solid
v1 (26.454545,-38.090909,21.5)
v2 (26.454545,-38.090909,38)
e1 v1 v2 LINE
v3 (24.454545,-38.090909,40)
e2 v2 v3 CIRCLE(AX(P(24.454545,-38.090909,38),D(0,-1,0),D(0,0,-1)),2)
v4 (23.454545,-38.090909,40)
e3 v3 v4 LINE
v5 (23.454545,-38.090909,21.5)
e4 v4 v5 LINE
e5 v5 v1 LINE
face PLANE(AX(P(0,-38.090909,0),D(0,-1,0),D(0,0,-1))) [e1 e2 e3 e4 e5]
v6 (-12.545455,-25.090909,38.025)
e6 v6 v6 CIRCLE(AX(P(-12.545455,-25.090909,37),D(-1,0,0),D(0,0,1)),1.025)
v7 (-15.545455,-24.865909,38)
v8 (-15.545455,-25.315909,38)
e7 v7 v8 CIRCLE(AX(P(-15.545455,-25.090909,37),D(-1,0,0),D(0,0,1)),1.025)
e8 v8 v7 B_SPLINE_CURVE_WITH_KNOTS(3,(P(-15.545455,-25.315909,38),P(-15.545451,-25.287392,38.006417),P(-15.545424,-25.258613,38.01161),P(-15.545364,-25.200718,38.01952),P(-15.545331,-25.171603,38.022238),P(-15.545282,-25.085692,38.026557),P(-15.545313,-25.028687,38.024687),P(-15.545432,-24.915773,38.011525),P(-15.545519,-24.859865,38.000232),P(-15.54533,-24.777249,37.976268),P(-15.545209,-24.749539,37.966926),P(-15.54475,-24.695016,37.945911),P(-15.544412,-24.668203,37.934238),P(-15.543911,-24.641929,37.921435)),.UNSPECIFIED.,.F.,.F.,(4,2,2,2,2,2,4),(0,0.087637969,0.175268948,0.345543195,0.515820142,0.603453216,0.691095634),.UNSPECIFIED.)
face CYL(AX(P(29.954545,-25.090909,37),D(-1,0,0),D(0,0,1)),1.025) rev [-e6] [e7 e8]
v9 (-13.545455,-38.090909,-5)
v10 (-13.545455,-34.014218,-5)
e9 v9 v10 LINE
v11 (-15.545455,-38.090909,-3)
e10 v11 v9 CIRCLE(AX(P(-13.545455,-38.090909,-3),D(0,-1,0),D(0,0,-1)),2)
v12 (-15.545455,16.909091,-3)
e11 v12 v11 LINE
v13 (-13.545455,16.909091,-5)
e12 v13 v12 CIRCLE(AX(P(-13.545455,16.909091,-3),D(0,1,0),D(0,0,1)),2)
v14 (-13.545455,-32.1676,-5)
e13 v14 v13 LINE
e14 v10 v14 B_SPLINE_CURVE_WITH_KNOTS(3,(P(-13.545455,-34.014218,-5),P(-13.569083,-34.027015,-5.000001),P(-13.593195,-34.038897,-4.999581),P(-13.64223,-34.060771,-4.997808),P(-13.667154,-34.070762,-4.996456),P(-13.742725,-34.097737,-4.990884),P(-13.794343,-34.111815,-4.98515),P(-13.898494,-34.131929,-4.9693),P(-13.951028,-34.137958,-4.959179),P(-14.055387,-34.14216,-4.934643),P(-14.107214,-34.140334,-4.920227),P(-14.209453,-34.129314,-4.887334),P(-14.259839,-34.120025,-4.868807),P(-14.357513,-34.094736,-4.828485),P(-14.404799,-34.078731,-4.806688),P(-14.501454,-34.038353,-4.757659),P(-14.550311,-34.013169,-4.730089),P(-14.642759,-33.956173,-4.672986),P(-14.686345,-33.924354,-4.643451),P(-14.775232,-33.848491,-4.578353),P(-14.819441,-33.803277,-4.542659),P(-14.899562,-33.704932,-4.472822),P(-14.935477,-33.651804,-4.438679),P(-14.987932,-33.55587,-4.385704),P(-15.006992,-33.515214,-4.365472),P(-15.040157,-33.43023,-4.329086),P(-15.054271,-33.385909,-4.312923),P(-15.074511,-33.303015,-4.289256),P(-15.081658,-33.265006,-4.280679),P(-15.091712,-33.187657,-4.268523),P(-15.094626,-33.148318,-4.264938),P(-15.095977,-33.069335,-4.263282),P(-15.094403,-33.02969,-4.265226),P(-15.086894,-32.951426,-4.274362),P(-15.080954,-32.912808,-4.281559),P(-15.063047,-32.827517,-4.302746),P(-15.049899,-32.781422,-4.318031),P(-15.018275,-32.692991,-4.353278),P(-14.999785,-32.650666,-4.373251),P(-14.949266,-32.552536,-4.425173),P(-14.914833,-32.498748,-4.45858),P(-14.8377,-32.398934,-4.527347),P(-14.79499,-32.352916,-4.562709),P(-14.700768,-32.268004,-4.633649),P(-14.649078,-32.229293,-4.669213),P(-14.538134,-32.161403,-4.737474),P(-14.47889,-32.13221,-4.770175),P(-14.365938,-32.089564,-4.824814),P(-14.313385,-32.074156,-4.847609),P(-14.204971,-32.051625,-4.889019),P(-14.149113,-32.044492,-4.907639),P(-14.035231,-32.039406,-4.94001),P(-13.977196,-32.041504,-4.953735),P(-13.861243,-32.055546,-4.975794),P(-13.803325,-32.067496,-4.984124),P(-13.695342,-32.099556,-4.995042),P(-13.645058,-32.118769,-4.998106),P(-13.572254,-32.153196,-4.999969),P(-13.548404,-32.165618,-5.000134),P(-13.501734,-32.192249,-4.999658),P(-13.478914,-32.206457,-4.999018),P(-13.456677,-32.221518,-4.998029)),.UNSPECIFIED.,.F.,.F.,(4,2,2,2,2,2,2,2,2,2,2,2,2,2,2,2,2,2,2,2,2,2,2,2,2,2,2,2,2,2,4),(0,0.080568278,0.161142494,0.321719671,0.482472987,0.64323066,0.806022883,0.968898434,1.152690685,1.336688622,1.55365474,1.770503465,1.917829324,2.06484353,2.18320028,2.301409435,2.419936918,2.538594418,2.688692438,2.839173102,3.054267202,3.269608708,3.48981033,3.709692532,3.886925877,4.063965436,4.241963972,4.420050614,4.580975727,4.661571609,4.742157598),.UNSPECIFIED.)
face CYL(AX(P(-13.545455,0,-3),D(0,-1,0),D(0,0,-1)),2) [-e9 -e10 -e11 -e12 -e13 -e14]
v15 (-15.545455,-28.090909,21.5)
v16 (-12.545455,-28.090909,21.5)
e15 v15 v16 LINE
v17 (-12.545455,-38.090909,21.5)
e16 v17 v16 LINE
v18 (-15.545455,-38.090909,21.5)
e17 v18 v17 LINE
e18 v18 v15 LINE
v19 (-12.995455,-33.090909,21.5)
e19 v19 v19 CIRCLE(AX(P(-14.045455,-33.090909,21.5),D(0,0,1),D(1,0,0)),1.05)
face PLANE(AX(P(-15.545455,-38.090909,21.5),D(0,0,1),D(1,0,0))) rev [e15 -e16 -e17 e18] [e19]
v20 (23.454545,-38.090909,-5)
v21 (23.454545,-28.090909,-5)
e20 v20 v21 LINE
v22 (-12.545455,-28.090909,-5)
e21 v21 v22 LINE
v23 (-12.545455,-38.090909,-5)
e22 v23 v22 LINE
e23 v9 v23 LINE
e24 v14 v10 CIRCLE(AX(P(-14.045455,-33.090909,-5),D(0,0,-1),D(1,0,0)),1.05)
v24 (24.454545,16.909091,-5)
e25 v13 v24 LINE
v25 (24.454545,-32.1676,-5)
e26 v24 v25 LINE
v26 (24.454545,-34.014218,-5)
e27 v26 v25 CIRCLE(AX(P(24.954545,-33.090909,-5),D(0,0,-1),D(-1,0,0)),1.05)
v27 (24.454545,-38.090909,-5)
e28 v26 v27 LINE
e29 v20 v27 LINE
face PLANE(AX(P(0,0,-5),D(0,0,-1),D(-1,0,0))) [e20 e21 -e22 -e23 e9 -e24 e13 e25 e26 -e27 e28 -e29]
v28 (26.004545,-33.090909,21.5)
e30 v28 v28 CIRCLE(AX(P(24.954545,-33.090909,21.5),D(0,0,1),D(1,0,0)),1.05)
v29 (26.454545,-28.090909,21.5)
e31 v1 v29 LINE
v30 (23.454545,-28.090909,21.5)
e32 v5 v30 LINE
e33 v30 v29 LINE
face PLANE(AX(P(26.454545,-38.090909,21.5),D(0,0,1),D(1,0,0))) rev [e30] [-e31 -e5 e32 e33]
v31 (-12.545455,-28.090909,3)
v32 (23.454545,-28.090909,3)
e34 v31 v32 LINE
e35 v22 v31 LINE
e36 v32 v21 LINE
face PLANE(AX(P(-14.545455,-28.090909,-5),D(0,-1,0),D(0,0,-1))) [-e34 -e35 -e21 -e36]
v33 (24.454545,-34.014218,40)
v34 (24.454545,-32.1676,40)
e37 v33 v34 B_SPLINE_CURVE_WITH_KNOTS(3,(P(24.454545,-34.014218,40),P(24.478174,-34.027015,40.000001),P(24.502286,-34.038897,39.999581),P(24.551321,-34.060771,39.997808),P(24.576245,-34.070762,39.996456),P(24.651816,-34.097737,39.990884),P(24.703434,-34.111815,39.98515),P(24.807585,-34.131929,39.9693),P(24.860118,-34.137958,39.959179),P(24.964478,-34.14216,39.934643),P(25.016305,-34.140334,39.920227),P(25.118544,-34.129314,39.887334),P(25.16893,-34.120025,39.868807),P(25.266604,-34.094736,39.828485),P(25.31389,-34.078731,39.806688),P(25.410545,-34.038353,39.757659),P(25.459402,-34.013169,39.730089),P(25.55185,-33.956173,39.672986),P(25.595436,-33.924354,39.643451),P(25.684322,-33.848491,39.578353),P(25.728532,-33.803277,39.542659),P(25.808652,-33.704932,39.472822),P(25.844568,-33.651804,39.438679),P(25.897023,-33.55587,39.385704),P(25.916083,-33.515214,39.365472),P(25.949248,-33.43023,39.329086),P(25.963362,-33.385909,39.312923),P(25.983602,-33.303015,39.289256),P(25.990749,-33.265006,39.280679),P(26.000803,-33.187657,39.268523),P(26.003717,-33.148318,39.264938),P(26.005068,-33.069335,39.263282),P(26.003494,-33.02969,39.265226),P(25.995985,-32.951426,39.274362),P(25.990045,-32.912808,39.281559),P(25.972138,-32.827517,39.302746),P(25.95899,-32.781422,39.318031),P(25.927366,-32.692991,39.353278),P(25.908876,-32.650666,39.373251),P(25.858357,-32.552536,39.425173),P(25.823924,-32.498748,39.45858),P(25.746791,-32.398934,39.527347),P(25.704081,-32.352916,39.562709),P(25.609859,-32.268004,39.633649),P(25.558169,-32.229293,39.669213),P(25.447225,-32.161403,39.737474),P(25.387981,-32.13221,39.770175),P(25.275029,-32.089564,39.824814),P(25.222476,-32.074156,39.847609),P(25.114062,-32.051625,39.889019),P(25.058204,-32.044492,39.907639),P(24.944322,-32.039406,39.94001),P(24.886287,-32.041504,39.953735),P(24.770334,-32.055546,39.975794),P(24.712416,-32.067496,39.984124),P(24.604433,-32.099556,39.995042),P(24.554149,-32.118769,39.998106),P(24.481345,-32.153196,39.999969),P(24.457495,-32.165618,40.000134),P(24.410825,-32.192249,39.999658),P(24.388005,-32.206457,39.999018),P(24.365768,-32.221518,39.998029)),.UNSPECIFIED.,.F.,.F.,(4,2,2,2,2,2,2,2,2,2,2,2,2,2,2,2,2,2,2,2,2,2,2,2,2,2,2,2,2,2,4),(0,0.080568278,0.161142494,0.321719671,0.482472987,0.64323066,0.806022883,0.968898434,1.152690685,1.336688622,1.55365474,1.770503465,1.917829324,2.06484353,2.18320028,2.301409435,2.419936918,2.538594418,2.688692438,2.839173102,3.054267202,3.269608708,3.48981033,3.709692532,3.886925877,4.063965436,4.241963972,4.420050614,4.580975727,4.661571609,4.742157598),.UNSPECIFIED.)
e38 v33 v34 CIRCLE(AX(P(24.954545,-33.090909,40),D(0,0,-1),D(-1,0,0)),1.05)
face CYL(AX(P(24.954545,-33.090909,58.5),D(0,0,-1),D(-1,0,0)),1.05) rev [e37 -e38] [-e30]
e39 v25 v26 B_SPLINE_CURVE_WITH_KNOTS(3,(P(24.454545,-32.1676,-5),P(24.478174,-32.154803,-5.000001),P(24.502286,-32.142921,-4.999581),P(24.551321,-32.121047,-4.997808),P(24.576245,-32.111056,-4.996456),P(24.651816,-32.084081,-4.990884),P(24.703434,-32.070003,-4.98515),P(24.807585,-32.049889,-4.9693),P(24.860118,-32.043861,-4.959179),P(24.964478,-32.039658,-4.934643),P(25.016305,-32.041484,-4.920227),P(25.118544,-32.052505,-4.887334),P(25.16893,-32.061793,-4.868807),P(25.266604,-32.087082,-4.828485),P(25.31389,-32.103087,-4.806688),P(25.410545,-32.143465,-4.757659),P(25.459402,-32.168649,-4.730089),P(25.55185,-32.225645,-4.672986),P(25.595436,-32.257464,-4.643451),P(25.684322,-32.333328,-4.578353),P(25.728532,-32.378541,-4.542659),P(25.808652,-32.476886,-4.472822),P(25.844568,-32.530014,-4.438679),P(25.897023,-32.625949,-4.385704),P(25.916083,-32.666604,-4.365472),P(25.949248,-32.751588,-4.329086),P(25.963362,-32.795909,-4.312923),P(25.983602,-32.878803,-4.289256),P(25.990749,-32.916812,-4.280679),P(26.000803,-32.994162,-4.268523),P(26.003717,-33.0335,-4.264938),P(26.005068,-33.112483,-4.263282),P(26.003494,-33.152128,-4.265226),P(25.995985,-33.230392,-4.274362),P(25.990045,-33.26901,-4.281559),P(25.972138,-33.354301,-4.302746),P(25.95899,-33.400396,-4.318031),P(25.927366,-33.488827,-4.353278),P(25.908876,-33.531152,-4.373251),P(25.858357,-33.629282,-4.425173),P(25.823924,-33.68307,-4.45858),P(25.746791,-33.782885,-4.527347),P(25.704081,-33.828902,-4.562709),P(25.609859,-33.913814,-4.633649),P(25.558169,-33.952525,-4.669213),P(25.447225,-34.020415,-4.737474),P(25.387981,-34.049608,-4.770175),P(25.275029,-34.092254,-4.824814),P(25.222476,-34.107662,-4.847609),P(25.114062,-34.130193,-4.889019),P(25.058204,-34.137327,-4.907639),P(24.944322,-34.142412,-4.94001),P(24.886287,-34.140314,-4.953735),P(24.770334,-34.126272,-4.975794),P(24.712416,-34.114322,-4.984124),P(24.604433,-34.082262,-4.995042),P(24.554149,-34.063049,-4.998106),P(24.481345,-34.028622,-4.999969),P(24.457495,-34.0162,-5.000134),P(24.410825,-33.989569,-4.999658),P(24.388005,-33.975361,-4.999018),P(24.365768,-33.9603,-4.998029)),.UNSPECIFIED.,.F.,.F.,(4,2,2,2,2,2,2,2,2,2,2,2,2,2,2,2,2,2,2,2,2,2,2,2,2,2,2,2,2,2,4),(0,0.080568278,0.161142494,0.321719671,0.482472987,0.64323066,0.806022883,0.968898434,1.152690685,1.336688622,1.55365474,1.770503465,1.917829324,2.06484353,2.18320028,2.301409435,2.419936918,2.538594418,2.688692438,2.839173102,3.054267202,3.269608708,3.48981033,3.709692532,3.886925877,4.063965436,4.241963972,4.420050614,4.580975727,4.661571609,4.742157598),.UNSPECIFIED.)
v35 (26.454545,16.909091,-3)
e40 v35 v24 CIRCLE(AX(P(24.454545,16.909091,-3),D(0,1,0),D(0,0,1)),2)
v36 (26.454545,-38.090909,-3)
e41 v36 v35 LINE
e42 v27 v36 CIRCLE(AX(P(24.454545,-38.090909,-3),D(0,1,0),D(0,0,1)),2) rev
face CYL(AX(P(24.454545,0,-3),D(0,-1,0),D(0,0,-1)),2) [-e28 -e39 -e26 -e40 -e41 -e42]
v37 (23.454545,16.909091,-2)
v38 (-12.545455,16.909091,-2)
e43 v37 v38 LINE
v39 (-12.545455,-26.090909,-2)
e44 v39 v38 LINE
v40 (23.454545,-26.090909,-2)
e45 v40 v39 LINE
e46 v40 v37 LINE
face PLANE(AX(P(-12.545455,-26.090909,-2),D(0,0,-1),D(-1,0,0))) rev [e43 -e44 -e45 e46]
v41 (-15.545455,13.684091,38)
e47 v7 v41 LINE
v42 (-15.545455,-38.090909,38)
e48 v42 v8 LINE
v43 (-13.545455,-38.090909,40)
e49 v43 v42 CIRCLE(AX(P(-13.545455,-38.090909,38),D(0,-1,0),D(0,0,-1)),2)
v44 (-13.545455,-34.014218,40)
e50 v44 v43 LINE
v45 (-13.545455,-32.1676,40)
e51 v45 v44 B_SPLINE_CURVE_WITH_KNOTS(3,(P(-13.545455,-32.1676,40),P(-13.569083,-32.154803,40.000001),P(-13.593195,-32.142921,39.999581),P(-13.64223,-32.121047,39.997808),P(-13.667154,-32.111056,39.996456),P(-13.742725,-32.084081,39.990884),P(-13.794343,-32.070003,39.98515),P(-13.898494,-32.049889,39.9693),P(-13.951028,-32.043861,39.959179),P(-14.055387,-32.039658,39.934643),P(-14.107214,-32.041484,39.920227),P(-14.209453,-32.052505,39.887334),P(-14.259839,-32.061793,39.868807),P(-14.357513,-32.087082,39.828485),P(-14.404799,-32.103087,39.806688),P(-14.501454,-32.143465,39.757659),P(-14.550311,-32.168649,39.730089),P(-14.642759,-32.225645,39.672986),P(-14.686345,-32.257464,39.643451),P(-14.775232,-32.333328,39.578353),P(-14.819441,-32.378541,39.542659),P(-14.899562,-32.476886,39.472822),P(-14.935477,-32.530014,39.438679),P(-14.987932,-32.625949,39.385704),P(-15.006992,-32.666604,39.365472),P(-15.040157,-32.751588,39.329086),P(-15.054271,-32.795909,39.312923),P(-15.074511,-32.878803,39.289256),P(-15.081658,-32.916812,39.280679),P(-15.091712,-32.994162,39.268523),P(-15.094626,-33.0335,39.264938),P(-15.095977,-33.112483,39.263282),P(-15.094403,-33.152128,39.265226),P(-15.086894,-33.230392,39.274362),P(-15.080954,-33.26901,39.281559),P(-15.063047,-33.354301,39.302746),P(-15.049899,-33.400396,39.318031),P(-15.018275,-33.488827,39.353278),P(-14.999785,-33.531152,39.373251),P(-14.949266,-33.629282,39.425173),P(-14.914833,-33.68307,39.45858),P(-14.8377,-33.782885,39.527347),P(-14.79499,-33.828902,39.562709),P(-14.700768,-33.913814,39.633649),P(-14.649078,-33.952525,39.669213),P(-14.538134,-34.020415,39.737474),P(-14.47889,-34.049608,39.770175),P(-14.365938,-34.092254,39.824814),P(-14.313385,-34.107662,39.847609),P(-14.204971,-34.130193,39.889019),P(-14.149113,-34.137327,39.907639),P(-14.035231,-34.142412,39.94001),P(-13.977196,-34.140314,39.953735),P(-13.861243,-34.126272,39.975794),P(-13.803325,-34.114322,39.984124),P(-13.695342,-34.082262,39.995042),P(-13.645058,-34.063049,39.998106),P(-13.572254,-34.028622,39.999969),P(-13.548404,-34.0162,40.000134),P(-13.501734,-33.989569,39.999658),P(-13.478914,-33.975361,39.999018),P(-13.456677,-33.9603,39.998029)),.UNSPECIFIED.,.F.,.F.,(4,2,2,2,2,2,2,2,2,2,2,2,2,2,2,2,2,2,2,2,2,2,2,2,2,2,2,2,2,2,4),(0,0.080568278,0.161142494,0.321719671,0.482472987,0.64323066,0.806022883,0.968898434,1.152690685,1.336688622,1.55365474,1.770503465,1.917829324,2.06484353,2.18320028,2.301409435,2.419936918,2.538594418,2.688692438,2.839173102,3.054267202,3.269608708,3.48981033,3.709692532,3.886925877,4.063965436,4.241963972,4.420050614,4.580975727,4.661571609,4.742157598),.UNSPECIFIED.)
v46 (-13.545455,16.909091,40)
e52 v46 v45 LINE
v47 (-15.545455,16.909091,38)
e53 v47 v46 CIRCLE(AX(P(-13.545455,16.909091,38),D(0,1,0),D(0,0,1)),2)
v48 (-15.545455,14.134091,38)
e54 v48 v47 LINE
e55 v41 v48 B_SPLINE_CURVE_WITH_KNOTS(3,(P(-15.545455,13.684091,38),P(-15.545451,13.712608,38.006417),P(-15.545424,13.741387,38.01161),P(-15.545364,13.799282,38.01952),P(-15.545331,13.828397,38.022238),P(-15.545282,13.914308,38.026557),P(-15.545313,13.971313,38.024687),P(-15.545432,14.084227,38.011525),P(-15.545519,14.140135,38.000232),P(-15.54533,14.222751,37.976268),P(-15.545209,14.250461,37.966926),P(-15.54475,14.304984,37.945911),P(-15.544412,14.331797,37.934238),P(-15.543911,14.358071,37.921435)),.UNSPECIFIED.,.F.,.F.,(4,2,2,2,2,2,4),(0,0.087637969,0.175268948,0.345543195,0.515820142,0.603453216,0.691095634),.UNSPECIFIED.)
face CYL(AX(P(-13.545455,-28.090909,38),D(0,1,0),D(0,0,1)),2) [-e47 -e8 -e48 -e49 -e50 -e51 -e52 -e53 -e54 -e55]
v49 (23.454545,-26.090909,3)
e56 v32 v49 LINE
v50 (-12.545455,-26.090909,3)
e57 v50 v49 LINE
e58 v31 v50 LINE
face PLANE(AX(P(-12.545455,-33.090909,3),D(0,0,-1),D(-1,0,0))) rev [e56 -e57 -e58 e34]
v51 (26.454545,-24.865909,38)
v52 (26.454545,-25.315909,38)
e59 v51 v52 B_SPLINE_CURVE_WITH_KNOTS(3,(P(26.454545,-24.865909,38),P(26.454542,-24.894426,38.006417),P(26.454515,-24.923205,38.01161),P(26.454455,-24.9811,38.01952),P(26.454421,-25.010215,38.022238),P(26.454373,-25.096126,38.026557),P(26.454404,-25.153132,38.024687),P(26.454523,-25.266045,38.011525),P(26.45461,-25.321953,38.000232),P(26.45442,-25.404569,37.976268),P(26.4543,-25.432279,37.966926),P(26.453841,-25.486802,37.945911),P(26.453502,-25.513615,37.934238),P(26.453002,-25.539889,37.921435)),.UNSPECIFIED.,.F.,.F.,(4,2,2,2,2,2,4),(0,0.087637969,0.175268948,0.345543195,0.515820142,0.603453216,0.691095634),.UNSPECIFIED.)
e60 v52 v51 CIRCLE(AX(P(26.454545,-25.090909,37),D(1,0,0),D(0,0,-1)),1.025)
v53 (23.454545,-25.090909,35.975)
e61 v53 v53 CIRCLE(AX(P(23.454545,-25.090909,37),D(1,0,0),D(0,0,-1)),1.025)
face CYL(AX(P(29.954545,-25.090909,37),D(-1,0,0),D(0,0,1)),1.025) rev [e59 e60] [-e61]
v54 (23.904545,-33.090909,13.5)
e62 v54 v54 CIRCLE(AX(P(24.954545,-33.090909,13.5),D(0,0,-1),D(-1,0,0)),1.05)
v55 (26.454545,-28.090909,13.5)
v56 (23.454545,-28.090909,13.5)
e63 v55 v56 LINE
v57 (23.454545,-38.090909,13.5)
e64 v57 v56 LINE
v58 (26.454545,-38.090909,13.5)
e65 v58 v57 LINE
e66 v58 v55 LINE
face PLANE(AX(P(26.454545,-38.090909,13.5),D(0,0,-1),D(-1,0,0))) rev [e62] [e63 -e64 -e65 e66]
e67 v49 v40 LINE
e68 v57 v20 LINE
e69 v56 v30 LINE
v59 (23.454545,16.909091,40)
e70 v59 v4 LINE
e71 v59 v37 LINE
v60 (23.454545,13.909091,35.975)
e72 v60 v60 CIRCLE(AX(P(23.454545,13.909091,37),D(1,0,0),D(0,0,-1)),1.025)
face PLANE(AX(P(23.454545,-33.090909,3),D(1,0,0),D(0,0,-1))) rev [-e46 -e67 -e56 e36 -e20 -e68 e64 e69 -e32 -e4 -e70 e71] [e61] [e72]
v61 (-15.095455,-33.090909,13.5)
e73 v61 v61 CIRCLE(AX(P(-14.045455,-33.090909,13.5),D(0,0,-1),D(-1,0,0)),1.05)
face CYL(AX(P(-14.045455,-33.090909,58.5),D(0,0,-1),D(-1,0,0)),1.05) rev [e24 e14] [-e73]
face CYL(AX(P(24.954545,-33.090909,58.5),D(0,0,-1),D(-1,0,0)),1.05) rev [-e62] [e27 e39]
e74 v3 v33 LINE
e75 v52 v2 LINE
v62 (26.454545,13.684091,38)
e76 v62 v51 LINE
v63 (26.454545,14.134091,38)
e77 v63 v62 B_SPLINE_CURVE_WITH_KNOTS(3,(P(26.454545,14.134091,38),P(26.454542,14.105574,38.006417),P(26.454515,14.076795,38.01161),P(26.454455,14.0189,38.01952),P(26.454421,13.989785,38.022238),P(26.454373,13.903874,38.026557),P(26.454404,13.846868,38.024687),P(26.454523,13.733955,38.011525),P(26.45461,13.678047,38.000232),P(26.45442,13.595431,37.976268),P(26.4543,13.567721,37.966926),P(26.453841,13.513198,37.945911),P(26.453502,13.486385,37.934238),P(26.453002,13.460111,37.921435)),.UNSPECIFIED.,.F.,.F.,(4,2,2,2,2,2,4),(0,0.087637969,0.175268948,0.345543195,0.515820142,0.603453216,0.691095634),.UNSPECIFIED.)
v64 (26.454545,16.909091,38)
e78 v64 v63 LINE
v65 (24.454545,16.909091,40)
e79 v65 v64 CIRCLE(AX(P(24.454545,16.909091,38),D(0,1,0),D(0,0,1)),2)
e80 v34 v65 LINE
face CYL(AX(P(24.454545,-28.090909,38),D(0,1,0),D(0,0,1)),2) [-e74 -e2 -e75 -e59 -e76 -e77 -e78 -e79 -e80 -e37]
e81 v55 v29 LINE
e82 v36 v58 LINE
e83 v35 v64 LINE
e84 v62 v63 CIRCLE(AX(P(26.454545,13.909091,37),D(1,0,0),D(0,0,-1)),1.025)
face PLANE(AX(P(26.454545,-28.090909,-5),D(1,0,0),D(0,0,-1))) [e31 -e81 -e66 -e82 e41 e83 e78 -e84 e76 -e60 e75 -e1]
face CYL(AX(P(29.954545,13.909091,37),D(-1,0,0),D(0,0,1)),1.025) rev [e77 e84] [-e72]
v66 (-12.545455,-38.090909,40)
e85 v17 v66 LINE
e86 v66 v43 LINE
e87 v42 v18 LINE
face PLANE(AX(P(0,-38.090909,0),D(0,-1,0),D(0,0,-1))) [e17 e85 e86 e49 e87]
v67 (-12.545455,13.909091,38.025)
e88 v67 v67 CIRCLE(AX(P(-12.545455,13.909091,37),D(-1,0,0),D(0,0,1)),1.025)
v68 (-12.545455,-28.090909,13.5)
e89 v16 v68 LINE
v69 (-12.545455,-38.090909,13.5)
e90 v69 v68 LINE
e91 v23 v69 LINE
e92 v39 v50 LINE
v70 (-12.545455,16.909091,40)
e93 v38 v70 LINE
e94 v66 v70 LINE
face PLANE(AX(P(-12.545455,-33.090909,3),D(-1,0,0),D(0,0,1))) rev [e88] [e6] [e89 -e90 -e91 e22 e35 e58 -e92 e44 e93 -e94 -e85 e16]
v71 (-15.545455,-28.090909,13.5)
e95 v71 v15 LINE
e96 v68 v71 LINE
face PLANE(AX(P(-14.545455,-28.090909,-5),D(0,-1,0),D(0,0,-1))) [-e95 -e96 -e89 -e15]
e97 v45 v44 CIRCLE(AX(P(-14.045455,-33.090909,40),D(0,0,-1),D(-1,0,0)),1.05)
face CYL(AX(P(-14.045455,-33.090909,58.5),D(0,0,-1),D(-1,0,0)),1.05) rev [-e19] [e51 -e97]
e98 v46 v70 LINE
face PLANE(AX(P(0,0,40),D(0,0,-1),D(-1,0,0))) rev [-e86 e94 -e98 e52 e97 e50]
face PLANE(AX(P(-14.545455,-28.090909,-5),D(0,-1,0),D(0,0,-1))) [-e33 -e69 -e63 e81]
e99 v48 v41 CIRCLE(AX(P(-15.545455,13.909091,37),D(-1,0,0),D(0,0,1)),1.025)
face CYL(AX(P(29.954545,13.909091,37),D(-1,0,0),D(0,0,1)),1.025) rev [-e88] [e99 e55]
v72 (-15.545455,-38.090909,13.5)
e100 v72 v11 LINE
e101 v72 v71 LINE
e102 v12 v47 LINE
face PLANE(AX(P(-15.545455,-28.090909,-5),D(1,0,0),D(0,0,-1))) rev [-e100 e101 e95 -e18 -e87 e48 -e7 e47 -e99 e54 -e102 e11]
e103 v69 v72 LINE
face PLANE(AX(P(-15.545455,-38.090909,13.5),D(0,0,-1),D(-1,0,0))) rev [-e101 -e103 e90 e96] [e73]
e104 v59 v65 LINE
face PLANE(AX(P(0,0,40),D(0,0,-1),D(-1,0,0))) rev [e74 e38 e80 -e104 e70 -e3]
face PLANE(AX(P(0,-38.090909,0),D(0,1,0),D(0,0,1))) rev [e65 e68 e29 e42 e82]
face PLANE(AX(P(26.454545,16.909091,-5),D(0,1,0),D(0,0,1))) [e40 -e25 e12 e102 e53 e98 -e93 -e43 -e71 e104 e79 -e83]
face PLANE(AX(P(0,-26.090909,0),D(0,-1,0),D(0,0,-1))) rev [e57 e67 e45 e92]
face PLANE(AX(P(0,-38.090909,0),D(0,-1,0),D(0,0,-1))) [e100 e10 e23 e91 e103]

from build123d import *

# Parameters (mm, degrees)
EXTRUDE_1_DEPTH      = 40
EXTRUDE_1_DEPTH_BACK = 5
SKETCH_2_W           = 36
SKETCH_2_H           = 37
CUT_EXTRUDE_1_DEPTH  = 50
SKETCH_5_W           = 36
SKETCH_5_H           = 5
CUT_EXTRUDE_4_DEPTH  = 43
SKETCH_9_R           = 1.025
CUT_EXTRUDE_5_DEPTH  = 45.5
SKETCH_11_W          = 3
SKETCH_11_H          = 18.5
EXTRUDE_5_DEPTH      = 10
SKETCH_13_R          = 1.05
CUT_EXTRUDE_7_DEPTH  = 63.5
FILLET_4_R           = 2
FILLET_5_R           = 2
FILLET_6_R           = 2
FILLET_7_R           = 2


with BuildPart() as part:
    # 草圖1 → 填料-伸長1 (new, two sides: drawn at the far end of the back side and taken through both)
    with BuildSketch(Plane.XY.offset(-EXTRUDE_1_DEPTH_BACK)):
        Polygon((-14.545454545, -28.090909091), (-15.545454545, -28.090909091), (-15.545454545, 16.909090909), (-14.545454545, 16.909090909), (25.454545455, 16.909090909), (26.454545455, 16.909090909), (26.454545455, -28.090909091), (25.454545455, -28.090909091), align=None)
    extrude(amount=EXTRUDE_1_DEPTH + EXTRUDE_1_DEPTH_BACK)

    # 草圖2 → 除料-伸長1 (cut)
    with BuildSketch(Plane(origin=(0, 16.909090909, 0), x_dir=(1, 0, 0), z_dir=(0, 1, 0))):
        with Locations((5.454545455, -21.5)):
            Rectangle(SKETCH_2_W, SKETCH_2_H)
    extrude(amount=-CUT_EXTRUDE_1_DEPTH, mode=Mode.SUBTRACT)

    # 草圖5 → 除料-伸長4 (cut)
    with BuildSketch(Plane(origin=(0, 16.909090909, 0), x_dir=(1, 0, 0), z_dir=(0, 1, 0))):
        with Locations((5.454545455, -0.5)):
            Rectangle(SKETCH_5_W, SKETCH_5_H)
    extrude(amount=-CUT_EXTRUDE_4_DEPTH, mode=Mode.SUBTRACT)

    # 草圖9 → 除料-伸長5 (cut)
    with BuildSketch(Plane.ZY.offset(15.545454545)):
        with Locations(Location((37, -25.090909091, 0), (0, 0, 180))):
            Circle(SKETCH_9_R)
        with Locations(Location((37, 13.909090909, 0), (0, 0, 180))):
            Circle(SKETCH_9_R)
    extrude(amount=-CUT_EXTRUDE_5_DEPTH, mode=Mode.SUBTRACT)

    # 草圖11 → 填料-伸長5 (add)
    with BuildSketch(Plane(origin=(0, -28.090909091, 0), x_dir=(-1, 0, 0), z_dir=(0, -1, 0))):
        with Locations((-24.954545455, -30.75)):
            Rectangle(SKETCH_11_W, SKETCH_11_H)
        with Locations((-24.954545455, -4.25)):
            Rectangle(SKETCH_11_W, SKETCH_11_H)
        with Locations((14.045454545, -30.75)):
            Rectangle(SKETCH_11_W, SKETCH_11_H)
        with Locations((14.045454545, -4.25)):
            Rectangle(SKETCH_11_W, SKETCH_11_H)
    extrude(amount=EXTRUDE_5_DEPTH)

    # 草圖13 → 除料-伸長7 (cut)
    with BuildSketch(Plane(origin=(0, 0, -5), x_dir=(-1, 0, 0), z_dir=(0, 0, -1))):
        with Locations((-24.954545455, -33.090909091)):
            Circle(SKETCH_13_R)
        with Locations((14.045454545, -33.090909091)):
            Circle(SKETCH_13_R)
    extrude(amount=-CUT_EXTRUDE_7_DEPTH, mode=Mode.SUBTRACT)

    # 圓角4
    # the kernel refuses this fillet: 2 mm, written as the material it takes off along each edge
    with BuildSketch(Plane(origin=(26.454545455, 21.909090909, -5), x_dir=(-1, 0, 0), z_dir=(0, -1, 0))) as fillet_4_piece_1:
        with BuildLine():
            CenterArc((FILLET_4_R, -FILLET_4_R), FILLET_4_R, 90, 90)
            Line((0, -FILLET_4_R), (0, 0))
            Line((0, 0), (FILLET_4_R, 0))
        make_face()
    extrude(amount=65, mode=Mode.SUBTRACT)

    # 圓角5
    # the kernel refuses this fillet: 2 mm, written as the material it takes off along each edge
    with BuildSketch(Plane(origin=(-15.545454545, 21.909090909, -5), x_dir=(0, 0, 1), z_dir=(0, -1, 0))) as fillet_5_piece_1:
        with BuildLine():
            CenterArc((FILLET_5_R, -FILLET_5_R), FILLET_5_R, 90, 90)
            Line((0, -FILLET_5_R), (0, 0))
            Line((0, 0), (FILLET_5_R, 0))
        make_face()
    extrude(amount=65, mode=Mode.SUBTRACT)

    # 圓角6
    # the kernel refuses this fillet: 2 mm, written as the material it takes off along each edge
    with BuildSketch(Plane(origin=(26.454545455, -43.090909091, 40), x_dir=(0, 0, -1), z_dir=(0, 1, 0))) as fillet_6_piece_1:
        with BuildLine():
            CenterArc((FILLET_6_R, FILLET_6_R), FILLET_6_R, 180, 90)
            Line((0, FILLET_6_R), (0, 0))
            Line((0, 0), (FILLET_6_R, 0))
        make_face()
    extrude(amount=65, mode=Mode.SUBTRACT)

    # 圓角7
    # the kernel refuses this fillet: 2 mm, written as the material it takes off along each edge
    with BuildSketch(Plane(origin=(-15.545454545, -43.090909091, 40), x_dir=(0, 0, -1), z_dir=(0, 1, 0))) as fillet_7_piece_1:
        with BuildLine():
            CenterArc((FILLET_7_R, -FILLET_7_R), FILLET_7_R, 90, 90)
            Line((0, -FILLET_7_R), (0, 0))
            Line((0, 0), (FILLET_7_R, 0))
        make_face()
    extrude(amount=65, mode=Mode.SUBTRACT)


solid = part.part
